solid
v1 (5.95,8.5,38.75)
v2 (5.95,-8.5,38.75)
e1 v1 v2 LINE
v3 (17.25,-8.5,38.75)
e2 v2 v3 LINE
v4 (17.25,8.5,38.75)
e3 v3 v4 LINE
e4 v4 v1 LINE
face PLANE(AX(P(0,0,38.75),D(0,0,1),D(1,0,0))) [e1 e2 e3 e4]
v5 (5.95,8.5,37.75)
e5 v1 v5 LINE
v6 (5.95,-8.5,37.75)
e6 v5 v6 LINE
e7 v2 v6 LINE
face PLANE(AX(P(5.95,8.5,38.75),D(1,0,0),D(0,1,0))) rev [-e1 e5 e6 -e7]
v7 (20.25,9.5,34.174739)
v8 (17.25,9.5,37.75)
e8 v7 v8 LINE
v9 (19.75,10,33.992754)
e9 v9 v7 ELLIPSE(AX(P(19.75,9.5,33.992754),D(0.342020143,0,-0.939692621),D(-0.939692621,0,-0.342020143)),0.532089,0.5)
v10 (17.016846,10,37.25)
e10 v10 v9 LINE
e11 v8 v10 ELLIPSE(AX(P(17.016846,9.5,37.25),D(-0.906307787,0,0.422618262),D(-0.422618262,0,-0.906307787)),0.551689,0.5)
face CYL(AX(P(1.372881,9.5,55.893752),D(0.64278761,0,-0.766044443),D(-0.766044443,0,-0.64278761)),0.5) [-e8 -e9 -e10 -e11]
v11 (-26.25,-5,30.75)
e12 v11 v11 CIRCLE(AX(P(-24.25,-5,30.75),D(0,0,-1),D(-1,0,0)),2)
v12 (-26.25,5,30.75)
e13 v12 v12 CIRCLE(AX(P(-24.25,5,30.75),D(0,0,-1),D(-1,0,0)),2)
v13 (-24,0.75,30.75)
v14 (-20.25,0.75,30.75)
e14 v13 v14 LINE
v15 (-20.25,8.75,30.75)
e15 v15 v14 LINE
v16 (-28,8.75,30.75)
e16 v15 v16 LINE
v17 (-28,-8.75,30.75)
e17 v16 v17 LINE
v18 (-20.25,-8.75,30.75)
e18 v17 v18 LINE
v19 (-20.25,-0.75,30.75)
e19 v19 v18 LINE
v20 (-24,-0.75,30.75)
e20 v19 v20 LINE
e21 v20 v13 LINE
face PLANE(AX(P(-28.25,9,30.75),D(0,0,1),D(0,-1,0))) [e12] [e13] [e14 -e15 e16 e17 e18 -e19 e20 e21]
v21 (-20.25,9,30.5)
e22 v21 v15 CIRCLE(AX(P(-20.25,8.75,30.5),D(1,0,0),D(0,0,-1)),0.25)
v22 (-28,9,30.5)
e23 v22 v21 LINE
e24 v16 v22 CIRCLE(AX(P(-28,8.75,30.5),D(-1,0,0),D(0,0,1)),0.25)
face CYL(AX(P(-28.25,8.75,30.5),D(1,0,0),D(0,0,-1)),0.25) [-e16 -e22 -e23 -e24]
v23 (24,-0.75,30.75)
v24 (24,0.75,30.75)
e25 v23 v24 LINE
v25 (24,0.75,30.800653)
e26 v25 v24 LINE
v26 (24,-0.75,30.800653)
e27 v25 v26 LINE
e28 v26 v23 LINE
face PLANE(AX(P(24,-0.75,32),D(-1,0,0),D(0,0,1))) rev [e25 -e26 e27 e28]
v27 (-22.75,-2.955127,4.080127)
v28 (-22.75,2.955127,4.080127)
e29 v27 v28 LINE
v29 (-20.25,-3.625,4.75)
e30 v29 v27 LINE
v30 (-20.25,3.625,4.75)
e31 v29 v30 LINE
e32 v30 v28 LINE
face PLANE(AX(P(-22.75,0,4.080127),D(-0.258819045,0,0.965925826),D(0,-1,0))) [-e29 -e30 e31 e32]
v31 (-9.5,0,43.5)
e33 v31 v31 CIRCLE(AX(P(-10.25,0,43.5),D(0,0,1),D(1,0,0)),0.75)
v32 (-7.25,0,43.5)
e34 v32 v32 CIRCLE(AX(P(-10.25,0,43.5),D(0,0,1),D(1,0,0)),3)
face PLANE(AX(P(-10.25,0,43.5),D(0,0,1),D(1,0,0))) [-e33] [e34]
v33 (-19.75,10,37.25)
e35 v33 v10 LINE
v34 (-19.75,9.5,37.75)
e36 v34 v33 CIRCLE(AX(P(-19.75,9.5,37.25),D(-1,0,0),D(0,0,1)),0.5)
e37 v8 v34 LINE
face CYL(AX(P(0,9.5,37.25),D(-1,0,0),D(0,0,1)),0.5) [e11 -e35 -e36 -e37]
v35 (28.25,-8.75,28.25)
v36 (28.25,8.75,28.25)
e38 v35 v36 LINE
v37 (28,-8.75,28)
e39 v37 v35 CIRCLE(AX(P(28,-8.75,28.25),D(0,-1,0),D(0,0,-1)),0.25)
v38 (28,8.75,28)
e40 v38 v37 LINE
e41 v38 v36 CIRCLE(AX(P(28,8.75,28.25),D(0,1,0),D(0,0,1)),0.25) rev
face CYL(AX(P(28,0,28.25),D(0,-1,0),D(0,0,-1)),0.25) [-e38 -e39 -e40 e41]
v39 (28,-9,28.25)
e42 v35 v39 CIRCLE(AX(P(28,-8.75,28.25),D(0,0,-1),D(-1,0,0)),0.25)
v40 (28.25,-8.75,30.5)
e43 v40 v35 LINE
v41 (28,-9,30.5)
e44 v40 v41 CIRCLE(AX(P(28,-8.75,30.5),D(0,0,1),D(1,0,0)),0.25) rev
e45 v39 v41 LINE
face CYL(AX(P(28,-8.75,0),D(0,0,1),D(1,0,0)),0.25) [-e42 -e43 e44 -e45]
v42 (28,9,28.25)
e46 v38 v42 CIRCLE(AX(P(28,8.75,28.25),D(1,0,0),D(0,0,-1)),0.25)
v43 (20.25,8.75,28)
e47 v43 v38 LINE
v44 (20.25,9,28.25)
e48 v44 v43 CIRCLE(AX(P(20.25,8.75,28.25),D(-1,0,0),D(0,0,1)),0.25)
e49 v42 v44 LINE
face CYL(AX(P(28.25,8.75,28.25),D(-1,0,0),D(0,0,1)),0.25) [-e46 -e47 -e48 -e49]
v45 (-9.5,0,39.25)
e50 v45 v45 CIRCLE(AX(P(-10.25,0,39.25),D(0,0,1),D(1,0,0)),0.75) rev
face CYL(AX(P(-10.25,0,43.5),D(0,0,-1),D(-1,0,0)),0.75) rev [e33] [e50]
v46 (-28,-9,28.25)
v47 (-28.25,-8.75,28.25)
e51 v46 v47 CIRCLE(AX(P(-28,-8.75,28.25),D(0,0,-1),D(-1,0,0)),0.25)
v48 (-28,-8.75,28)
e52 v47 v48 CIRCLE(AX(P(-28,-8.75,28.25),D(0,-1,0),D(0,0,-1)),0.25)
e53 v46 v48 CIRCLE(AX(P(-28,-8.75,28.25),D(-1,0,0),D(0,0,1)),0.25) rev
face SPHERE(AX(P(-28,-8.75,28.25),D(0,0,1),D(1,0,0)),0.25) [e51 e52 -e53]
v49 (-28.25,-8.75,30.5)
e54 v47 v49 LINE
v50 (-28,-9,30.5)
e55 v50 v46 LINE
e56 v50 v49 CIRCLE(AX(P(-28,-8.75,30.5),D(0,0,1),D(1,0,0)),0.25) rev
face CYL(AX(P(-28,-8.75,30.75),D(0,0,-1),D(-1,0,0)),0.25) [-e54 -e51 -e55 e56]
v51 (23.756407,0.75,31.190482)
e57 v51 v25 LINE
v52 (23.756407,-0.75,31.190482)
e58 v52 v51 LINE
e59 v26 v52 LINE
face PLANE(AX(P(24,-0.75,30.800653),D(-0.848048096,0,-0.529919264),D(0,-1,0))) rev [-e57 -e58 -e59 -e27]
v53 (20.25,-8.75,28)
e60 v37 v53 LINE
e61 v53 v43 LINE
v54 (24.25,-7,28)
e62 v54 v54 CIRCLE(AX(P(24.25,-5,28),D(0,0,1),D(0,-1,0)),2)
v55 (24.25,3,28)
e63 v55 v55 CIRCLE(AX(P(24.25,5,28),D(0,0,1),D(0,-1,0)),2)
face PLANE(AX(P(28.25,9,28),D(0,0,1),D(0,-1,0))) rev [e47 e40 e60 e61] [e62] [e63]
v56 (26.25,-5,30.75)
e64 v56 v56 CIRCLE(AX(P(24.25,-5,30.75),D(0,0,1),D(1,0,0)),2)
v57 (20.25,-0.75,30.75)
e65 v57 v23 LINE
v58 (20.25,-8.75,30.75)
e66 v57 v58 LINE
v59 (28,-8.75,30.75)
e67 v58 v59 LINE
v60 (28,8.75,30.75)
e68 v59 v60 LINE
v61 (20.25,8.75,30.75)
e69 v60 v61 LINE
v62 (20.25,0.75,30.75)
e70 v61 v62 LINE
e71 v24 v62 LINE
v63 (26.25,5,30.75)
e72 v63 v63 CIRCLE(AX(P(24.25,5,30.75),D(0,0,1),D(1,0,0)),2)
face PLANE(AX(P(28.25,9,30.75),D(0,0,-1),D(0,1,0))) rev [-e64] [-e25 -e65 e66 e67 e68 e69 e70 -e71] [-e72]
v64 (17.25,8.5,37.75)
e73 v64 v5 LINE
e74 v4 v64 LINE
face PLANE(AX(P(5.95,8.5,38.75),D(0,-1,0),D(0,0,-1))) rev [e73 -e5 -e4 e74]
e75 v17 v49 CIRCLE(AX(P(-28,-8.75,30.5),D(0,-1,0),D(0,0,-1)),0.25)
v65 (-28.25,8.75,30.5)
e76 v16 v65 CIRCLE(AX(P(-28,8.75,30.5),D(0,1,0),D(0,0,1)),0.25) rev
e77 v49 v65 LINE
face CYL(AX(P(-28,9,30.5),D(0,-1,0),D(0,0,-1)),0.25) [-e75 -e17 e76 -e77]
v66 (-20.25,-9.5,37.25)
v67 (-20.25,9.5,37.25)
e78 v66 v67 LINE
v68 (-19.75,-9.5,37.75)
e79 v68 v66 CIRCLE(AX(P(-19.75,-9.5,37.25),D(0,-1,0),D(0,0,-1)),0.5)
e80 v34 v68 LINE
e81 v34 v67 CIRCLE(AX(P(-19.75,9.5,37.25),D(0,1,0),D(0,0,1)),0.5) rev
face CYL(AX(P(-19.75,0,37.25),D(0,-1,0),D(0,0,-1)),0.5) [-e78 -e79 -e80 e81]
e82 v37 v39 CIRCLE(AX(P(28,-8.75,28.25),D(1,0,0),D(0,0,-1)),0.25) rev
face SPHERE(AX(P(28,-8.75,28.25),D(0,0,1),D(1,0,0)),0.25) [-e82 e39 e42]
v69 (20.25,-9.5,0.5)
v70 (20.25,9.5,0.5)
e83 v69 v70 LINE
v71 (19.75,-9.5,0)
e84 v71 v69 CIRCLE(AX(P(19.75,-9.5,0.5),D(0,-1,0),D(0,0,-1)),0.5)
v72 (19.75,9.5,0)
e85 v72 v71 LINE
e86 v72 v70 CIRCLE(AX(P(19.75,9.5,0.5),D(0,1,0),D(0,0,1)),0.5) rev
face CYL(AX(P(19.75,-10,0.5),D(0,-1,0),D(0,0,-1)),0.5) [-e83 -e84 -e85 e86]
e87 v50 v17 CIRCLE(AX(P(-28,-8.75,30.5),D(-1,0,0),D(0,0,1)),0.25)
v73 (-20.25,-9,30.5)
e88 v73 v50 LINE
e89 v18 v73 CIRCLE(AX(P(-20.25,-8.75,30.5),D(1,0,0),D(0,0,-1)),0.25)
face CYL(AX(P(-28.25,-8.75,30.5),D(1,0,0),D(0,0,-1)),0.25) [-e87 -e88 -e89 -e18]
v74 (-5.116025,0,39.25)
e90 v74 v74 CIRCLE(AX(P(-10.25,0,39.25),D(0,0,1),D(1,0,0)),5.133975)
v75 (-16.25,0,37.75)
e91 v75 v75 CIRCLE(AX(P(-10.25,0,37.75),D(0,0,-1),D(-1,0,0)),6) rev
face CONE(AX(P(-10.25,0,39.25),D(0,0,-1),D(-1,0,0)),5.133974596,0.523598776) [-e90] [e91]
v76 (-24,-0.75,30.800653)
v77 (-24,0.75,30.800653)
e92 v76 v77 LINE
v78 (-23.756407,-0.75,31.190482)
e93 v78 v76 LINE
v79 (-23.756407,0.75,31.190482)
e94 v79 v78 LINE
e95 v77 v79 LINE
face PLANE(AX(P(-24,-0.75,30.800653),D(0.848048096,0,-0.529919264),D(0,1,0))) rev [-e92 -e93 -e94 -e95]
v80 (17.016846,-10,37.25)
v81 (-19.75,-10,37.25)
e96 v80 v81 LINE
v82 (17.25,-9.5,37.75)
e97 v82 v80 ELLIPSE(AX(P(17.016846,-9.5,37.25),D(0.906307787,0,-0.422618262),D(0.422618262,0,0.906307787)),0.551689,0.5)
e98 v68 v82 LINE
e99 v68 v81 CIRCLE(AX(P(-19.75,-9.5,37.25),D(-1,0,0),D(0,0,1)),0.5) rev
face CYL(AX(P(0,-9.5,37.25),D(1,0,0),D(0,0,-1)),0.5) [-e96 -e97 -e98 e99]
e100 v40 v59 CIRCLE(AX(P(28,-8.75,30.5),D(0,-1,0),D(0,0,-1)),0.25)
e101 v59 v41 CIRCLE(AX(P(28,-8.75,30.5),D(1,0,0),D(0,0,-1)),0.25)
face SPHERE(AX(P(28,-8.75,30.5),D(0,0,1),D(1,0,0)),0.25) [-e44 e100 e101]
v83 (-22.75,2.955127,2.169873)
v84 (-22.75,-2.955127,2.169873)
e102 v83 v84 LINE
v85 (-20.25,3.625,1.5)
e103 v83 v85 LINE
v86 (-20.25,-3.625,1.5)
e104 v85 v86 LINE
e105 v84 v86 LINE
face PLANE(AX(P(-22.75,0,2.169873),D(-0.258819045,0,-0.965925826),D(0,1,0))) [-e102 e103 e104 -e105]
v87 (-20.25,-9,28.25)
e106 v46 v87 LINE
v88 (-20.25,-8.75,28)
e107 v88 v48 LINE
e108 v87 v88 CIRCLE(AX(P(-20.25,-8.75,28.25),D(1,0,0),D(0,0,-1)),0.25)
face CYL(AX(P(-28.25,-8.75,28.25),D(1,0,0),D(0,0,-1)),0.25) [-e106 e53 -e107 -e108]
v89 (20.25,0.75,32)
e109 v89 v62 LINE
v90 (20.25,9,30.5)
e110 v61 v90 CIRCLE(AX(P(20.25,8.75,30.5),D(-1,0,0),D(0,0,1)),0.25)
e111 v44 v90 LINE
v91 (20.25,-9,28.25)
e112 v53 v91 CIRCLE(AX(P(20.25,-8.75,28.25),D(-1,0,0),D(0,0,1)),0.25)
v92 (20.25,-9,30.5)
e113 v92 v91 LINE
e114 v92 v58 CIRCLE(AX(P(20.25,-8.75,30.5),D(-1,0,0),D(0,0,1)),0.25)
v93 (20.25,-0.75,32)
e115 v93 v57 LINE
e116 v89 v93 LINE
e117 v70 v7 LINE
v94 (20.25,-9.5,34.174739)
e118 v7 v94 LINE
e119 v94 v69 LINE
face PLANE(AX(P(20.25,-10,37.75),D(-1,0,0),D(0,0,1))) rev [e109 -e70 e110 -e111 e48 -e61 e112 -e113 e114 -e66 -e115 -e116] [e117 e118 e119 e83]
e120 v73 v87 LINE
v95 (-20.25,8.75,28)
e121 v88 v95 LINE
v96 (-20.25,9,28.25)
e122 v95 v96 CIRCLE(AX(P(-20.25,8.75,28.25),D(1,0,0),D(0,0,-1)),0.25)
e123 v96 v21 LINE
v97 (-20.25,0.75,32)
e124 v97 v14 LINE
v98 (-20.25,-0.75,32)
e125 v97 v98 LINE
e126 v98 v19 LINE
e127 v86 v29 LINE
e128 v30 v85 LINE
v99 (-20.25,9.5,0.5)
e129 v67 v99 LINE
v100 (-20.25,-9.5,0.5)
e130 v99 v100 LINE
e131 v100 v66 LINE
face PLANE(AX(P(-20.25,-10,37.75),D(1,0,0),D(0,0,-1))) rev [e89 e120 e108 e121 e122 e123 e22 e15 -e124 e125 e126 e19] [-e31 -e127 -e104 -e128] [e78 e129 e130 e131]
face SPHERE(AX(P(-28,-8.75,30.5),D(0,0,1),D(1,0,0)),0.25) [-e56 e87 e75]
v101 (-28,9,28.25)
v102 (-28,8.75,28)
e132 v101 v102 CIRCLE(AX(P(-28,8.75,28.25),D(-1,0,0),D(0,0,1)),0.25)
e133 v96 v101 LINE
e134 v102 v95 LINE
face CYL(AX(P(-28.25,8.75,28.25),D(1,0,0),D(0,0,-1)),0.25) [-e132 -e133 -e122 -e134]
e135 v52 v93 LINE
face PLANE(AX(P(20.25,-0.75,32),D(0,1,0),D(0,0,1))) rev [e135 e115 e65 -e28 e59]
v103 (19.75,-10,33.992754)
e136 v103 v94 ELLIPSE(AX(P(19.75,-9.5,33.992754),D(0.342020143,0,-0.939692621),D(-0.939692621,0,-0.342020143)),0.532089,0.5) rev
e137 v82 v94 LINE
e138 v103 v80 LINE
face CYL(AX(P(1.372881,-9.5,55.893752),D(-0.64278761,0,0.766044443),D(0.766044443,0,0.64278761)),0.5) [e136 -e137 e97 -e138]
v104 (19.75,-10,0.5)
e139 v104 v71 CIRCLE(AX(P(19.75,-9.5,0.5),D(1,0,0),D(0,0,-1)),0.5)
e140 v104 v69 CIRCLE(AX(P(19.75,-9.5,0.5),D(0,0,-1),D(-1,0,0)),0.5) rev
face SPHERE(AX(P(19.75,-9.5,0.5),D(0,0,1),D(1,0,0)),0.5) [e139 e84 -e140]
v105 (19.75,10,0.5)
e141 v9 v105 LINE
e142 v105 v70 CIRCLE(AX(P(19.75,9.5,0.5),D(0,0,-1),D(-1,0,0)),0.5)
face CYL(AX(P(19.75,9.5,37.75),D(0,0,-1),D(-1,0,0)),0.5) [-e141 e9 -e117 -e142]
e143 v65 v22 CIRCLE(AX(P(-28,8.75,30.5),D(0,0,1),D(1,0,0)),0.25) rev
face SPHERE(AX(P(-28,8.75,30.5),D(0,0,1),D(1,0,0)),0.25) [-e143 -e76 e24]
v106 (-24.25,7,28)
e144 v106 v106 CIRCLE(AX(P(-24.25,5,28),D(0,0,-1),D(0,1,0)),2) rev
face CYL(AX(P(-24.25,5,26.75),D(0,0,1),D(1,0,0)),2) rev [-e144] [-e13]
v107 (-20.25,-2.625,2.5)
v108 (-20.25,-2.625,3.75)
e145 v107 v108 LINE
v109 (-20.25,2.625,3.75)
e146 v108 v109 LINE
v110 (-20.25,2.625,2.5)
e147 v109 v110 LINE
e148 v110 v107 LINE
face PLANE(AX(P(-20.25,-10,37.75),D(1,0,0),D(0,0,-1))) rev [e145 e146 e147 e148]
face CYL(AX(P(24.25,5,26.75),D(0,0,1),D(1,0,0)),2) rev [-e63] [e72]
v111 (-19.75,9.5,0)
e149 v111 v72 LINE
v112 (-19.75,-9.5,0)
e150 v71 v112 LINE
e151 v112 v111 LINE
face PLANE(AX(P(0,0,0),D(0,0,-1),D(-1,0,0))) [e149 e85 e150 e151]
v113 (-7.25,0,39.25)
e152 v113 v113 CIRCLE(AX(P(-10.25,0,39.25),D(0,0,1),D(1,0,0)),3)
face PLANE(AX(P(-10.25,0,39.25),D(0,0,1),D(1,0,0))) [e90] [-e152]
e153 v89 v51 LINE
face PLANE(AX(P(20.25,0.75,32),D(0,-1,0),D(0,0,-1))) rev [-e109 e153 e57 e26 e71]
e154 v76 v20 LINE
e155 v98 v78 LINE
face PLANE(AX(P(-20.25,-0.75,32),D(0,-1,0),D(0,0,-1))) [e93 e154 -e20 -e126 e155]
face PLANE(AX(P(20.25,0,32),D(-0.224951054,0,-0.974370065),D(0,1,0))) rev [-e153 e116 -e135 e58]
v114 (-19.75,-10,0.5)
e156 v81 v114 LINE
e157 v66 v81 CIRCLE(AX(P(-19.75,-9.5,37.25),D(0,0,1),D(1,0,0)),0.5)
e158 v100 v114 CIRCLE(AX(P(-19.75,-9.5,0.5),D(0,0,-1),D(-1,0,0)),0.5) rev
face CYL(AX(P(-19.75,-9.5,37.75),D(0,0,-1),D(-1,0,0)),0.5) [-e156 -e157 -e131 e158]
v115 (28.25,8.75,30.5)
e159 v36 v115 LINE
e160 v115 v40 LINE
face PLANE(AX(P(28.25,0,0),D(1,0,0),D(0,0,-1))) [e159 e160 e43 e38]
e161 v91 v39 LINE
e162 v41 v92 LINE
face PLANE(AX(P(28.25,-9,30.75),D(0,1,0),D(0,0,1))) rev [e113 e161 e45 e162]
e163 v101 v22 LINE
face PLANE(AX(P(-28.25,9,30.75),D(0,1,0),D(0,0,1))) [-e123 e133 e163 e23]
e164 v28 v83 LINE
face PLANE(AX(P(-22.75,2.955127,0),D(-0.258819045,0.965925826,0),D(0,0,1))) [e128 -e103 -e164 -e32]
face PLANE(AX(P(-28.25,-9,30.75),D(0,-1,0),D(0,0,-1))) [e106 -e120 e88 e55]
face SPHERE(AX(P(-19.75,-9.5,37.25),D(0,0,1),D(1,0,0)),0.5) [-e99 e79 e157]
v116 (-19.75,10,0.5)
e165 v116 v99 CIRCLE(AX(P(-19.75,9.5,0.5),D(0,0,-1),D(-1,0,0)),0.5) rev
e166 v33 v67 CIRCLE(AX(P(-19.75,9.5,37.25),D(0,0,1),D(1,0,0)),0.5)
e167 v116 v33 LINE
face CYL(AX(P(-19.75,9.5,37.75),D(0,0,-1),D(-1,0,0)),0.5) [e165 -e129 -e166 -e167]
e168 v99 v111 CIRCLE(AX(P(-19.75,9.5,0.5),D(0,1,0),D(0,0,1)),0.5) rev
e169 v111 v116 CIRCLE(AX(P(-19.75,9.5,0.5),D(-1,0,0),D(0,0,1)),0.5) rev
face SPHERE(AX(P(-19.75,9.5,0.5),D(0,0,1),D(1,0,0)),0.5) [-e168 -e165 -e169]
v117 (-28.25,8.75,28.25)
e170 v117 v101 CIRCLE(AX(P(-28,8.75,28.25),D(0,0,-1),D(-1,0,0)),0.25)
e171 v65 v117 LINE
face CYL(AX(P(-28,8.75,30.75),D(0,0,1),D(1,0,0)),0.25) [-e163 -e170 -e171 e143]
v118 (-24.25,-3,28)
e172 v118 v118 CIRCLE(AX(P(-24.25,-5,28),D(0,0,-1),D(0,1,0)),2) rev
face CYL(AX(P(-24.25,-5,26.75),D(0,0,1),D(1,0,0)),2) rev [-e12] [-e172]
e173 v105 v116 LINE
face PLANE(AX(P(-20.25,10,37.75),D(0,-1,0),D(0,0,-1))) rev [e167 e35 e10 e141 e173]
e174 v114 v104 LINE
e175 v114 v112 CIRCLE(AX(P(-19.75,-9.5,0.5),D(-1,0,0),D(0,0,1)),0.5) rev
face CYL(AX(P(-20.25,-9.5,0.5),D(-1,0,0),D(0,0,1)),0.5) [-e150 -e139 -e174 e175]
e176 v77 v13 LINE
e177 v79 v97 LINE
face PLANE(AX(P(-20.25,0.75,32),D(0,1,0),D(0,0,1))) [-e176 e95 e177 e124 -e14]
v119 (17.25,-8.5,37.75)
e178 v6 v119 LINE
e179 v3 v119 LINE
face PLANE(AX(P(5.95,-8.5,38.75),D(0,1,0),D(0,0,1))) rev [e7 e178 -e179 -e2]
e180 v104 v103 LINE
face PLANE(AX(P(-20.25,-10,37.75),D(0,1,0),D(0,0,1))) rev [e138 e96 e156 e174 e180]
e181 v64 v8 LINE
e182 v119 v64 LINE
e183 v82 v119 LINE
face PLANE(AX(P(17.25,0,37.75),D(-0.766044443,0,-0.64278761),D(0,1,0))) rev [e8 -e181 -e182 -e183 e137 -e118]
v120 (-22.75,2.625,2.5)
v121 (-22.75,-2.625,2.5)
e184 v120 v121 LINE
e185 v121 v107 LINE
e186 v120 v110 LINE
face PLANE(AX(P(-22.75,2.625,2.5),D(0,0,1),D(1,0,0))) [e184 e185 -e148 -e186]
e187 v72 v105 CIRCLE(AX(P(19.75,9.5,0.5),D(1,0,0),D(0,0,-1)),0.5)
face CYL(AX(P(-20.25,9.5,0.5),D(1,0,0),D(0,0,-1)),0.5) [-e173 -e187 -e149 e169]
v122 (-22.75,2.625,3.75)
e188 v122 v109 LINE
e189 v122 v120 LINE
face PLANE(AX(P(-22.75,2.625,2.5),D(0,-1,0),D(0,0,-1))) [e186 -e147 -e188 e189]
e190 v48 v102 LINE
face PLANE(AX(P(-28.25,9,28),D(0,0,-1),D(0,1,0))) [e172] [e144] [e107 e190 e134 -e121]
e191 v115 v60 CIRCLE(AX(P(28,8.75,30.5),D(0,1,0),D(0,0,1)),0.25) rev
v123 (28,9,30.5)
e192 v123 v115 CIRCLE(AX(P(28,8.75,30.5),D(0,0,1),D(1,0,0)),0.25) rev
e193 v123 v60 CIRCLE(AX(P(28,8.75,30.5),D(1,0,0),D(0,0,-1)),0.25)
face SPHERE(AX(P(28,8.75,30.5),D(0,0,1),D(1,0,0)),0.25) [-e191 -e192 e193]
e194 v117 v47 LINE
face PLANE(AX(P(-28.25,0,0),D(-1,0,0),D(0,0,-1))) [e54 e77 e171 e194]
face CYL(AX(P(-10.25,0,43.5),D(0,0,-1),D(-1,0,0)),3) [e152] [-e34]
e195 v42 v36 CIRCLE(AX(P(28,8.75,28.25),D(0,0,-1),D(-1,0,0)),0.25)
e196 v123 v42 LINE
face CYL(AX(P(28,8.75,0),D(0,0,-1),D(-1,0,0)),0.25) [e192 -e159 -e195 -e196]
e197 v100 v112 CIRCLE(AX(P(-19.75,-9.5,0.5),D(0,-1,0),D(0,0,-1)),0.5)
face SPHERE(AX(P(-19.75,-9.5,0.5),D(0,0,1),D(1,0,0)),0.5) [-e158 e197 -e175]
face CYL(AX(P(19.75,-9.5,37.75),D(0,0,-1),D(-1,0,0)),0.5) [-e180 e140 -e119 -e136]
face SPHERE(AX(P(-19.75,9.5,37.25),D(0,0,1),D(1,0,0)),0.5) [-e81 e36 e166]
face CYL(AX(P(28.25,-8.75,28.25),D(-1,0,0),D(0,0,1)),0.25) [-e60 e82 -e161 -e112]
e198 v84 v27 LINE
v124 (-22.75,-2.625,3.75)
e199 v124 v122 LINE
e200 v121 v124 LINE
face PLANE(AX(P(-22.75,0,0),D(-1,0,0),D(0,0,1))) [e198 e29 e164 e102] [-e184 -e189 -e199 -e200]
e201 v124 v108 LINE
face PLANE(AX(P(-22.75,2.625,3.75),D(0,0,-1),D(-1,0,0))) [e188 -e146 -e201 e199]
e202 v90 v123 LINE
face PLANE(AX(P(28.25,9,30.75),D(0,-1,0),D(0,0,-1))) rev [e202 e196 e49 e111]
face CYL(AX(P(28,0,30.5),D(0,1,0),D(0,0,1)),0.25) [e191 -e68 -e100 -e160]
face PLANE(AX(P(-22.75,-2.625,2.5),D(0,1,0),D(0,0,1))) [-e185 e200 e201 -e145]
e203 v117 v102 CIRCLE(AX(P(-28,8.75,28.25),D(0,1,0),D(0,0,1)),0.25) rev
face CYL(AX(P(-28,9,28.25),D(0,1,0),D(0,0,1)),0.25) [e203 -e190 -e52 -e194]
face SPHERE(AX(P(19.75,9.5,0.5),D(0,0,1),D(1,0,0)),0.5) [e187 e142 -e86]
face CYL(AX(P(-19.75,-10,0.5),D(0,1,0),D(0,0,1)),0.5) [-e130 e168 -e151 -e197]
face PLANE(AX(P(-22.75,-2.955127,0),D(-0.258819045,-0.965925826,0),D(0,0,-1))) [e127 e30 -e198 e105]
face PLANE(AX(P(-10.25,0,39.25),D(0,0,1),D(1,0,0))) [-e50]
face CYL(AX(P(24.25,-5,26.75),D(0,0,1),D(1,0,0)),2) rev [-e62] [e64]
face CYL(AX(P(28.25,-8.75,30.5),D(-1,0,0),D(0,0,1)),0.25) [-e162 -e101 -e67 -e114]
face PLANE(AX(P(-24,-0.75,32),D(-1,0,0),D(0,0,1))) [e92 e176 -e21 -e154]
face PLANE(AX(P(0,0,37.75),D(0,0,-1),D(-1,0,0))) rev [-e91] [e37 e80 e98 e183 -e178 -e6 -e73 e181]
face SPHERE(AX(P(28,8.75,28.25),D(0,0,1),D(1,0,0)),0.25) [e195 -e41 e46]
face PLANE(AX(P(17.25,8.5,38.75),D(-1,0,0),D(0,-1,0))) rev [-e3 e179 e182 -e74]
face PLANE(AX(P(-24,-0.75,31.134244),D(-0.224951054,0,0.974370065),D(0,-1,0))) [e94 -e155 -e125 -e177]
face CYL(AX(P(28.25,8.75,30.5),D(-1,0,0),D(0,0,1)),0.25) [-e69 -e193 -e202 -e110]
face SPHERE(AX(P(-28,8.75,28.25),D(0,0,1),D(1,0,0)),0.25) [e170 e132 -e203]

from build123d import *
from OCP.BRepFilletAPI import BRepFilletAPI_MakeChamfer

# Parameters (mm, degrees)
SKETCH1_W                 = 40.5
SKETCH1_H                 = 20
BOSS_EXTRUDE1_DEPTH       = 37.75
SKETCH2_W                 = 2.75
SKETCH2_H                 = 18
BOSS_EXTRUDE2_DEPTH       = 8
SKETCH3_R                 = 2
CUT_EXTRUDE1_DEPTH        = 4
SKETCH4_W                 = 3.75
SKETCH4_H                 = 1.5
BOSS_EXTRUDE3_DEPTH       = 1.25
CHAMFER1_SIZE2            = 0.865755717
CHAMFER1_SIZE             = 3.75
CHAMFER2_SIZE             = 0.25
CHAMFER2_SIZE2            = 0.333581356
FILLET1_R                 = 0.25
CHAMFER1_OF_MIRROR1_SIZE2 = 0.865755717
CHAMFER1_OF_MIRROR1_SIZE  = 3.75
CHAMFER2_OF_MIRROR1_SIZE2 = 0.25
CHAMFER2_OF_MIRROR1_SIZE  = 0.333581356
FILLET1_OF_MIRROR1_R      = 0.25
SKETCH5_W                 = 11.3
SKETCH5_H                 = 17
BOSS_EXTRUDE4_DEPTH       = 1
SKETCH6_R                 = 6
BOSS_EXTRUDE5_DEPTH       = 1.5
CHAMFER3_SIZE2            = 0.866025404
CHAMFER3_SIZE             = 1.5
SKETCH7_R                 = 3
SKETCH7_R_2               = 0.75
BOSS_EXTRUDE6_DEPTH       = 4.25
SKETCH8_W                 = 3.25
SKETCH8_H                 = 7.25
SKETCH8_W_2               = 1.25
SKETCH8_H_2               = 5.25
BOSS_EXTRUDE7_DEPTH       = 2.5
CHAMFER5_SIZE2            = 3.575260778
CHAMFER5_SIZE             = 3
CHAMFER4_SIZE             = 2.5
CHAMFER4_SIZE_2           = 0.669872981
FILLET2_R                 = 0.5


with BuildPart() as part:
    # Sketch1 → Boss-Extrude1 (new body)
    with BuildSketch(Plane.XY):
        Rectangle(SKETCH1_W, SKETCH1_H)
    extrude(amount=BOSS_EXTRUDE1_DEPTH)

    # Sketch2 → Boss-Extrude2 (add)
    with BuildSketch(Plane(origin=(20.25, 0, 0), x_dir=(0, 0, -1), z_dir=(1, 0, 0))):
        with Locations((-29.375, 0)):
            Rectangle(SKETCH2_W, SKETCH2_H)
    boss_extrude2 = extrude(amount=BOSS_EXTRUDE2_DEPTH)

    # Sketch3 → Cut-Extrude1 (cut)
    with BuildSketch(Plane.XY.offset(30.75)):
        with Locations((24.25, 5)):
            Circle(SKETCH3_R)
        with Locations((24.25, -5)):
            Circle(SKETCH3_R)
    cut_extrude1 = extrude(amount=-CUT_EXTRUDE1_DEPTH, mode=Mode.SUBTRACT)

    # Sketch4 → Boss-Extrude3 (add)
    with BuildSketch(Plane.XY.offset(30.75)):
        with Locations((22.125, 0)):
            Rectangle(SKETCH4_W, SKETCH4_H)
    boss_extrude3 = extrude(amount=BOSS_EXTRUDE3_DEPTH)

    # Chamfer1
    chamfer1_edges = [part.edges().sort_by_distance(p)[0] for p in [
        (24, 0, 32),
    ]]
    chamfer1_side = [part.faces().sort_by_distance(p)[0] for p in [
        (23.982684886, 0, 32),
    ]]
    chamfer(chamfer1_edges, length=CHAMFER1_SIZE - 0.0001, length2=CHAMFER1_SIZE2 - 0.0001, reference=chamfer1_side[0])  # a hair under: the kernel refuses the full size

    # Chamfer2
    chamfer2_edges = [part.edges().sort_by_distance(p)[0] for p in [
        (24, 0, 31.134344283),
    ]]
    chamfer2_side = [part.faces().sort_by_distance(p)[0] for p in [
        (22.12505, 0, 31.567172141),
    ]]
    chamfer(chamfer2_edges, length=CHAMFER2_SIZE, length2=CHAMFER2_SIZE2, reference=chamfer2_side[0])

    # Fillet1
    fillet1_edges = [part.edges().sort_by_distance(p)[0] for p in [
        (24.25, 9, 30.75),
        (24.25, -9, 30.75),
        (24.25, -9, 28),
        (24.25, 9, 28),
        (28.25, 0, 30.75),
        (28.25, -9, 29.375),
        (28.25, 0, 28),
        (28.25, 9, 29.375),
    ]]
    fillet(fillet1_edges, radius=FILLET1_R)

    # Mirror1: Boss-Extrude2, Cut-Extrude1, Boss-Extrude3 across plane
    add(boss_extrude2.mirror(Plane(origin=(0, 0, 0), x_dir=(0, 0, 1), z_dir=(1, 0, 0))))
    add(cut_extrude1.mirror(Plane(origin=(0, 0, 0), x_dir=(0, 0, 1), z_dir=(1, 0, 0))), mode=Mode.SUBTRACT)
    add(boss_extrude3.mirror(Plane(origin=(0, 0, 0), x_dir=(0, 0, 1), z_dir=(1, 0, 0))))

    # Chamfer1 of Mirror1
    chamfer1_of_mirror1_edges = [part.edges().sort_by_distance(p)[0] for p in [
        (-24, 0, 32),
    ]]
    chamfer1_of_mirror1_side = [part.faces().sort_by_distance(p)[0] for p in [
        (-23.982684886, 0, 32),
    ]]
    chamfer(chamfer1_of_mirror1_edges, length=CHAMFER1_OF_MIRROR1_SIZE - 0.0001, length2=CHAMFER1_OF_MIRROR1_SIZE2 - 0.0001, reference=chamfer1_of_mirror1_side[0])  # a hair under: the kernel refuses the full size

    # Chamfer2 of Mirror1
    chamfer2_of_mirror1_edges = [part.edges().sort_by_distance(p)[0] for p in [
        (-24, 0, 31.134344283),
    ]]
    chamfer(chamfer2_of_mirror1_edges, length=CHAMFER2_OF_MIRROR1_SIZE, length2=CHAMFER2_OF_MIRROR1_SIZE2)

    # Fillet1 of Mirror1
    fillet1_of_mirror1_edges = [part.edges().sort_by_distance(p)[0] for p in [
        (-24.25, 9, 30.75),
        (-24.25, -9, 30.75),
        (-24.25, -9, 28),
        (-24.25, 9, 28),
        (-28.25, 0, 30.75),
        (-28.25, -9, 29.375),
        (-28.25, 0, 28),
        (-28.25, 9, 29.375),
    ]]
    fillet(fillet1_of_mirror1_edges, radius=FILLET1_OF_MIRROR1_R)

    # Sketch5 → Boss-Extrude4 (add)
    with BuildSketch(Plane.XY.offset(37.75)):
        with Locations((11.6, 0)):
            Rectangle(SKETCH5_W, SKETCH5_H)
    extrude(amount=BOSS_EXTRUDE4_DEPTH)

    # Sketch6 → Boss-Extrude5 (add)
    with BuildSketch(Plane.XY.offset(37.75)):
        with Locations(Location((-10.25, 0, 0), (0, 0, 180))):
            Circle(SKETCH6_R)
    extrude(amount=BOSS_EXTRUDE5_DEPTH)

    # Chamfer3
    chamfer3_edges = [part.edges().sort_by_distance(p)[0] for p in [
        (-4.25, 0, 39.25),
    ]]
    chamfer3_side = [part.faces().sort_by_distance(p)[0] for p in [
        (-4.25, 0, 39.232679492),
    ]]
    chamfer(chamfer3_edges, length=CHAMFER3_SIZE - 0.0001, length2=CHAMFER3_SIZE2 - 0.0001, reference=chamfer3_side[0])  # a hair under: the kernel refuses the full size

    # Sketch7 → Boss-Extrude6 (add)
    with BuildSketch(Plane.XY.offset(39.25)):
        with Locations((-10.25, 0)):
            Circle(SKETCH7_R)
        with Locations((-10.25, 0)):
            Circle(SKETCH7_R_2, mode=Mode.SUBTRACT)
    extrude(amount=BOSS_EXTRUDE6_DEPTH)

    # Sketch8 → Boss-Extrude7 (add)
    with BuildSketch(Plane.ZY.offset(20.25)):
        with Locations((3.125, 0)):
            Rectangle(SKETCH8_W, SKETCH8_H)
        with Locations((3.125, 0)):
            Rectangle(SKETCH8_W_2, SKETCH8_H_2, mode=Mode.SUBTRACT)
    extrude(amount=BOSS_EXTRUDE7_DEPTH)

    # Chamfer5
    chamfer5_edges = [part.edges().sort_by_distance(p)[0] for p in [
        (20.25, 0, 37.75),
    ]]
    chamfer5_side = [part.faces().sort_by_distance(p)[0] for p in [
        (20.19, 0, 37.75),
    ]]
    chamfer(chamfer5_edges, length=CHAMFER5_SIZE - 0.0001, length2=CHAMFER5_SIZE2 - 0.0001, reference=chamfer5_side[0])  # a hair under: the kernel refuses the full size

    # Chamfer4
    chamfer4_edges_1 = [part.edges().sort_by_distance(p)[0] for p in [
        (-22.75, -3.625, 3.125),
    ]]
    chamfer4_side_1 = [part.faces().sort_by_distance(p)[0] for p in [
        (-22.73660254, -3.625, 3.125),
    ]]
    chamfer4_edges_2 = [part.edges().sort_by_distance(p)[0] for p in [
        (-22.75, 0, 4.75),
    ]]
    chamfer4_side_2 = [part.faces().sort_by_distance(p)[0] for p in [
        (-22.73660254, 0, 4.75),
    ]]
    chamfer4_edges_3 = [part.edges().sort_by_distance(p)[0] for p in [
        (-22.75, 3.625, 3.125),
    ]]
    chamfer4_side_3 = [part.faces().sort_by_distance(p)[0] for p in [
        (-22.73660254, 3.625, 3.125),
    ]]
    chamfer4_edges_4 = [part.edges().sort_by_distance(p)[0] for p in [
        (-22.75, 0, 1.5),
    ]]
    chamfer4_side_4 = [part.faces().sort_by_distance(p)[0] for p in [
        (-22.73660254, 0, 1.5),
    ]]
    chamfer4 = BRepFilletAPI_MakeChamfer(part.part.solid().wrapped)
    for e in chamfer4_edges_1:
        chamfer4.Add(CHAMFER4_SIZE - 0.0001, CHAMFER4_SIZE_2 - 0.0001, e.wrapped, chamfer4_side_1[0].wrapped)
    for e in chamfer4_edges_2:
        chamfer4.Add(CHAMFER4_SIZE - 0.0001, CHAMFER4_SIZE_2 - 0.0001, e.wrapped, chamfer4_side_2[0].wrapped)
    for e in chamfer4_edges_3:
        chamfer4.Add(CHAMFER4_SIZE - 0.0001, CHAMFER4_SIZE_2 - 0.0001, e.wrapped, chamfer4_side_3[0].wrapped)
    for e in chamfer4_edges_4:
        chamfer4.Add(CHAMFER4_SIZE - 0.0001, CHAMFER4_SIZE_2 - 0.0001, e.wrapped, chamfer4_side_4[0].wrapped)
    add(Compound.cast(chamfer4.Shape()), mode=Mode.REPLACE)  # a hair under: the kernel refuses the full size

    # Fillet2
    fillet2_edges = [part.edges().sort_by_distance(p)[0] for p in [
        (-20.25, 0, 37.75),
        (-1.49995, -10, 37.75),
        (-1.49995, 10, 37.75),
        (20.25, 10, 17.087419611),
        (18.75005, 10, 35.962419611),
        (20.25, -10, 17.087419611),
        (18.75005, -10, 35.962419611),
        (0, -10, 0),
        (-20.25, 0, 0),
        (0, 10, 0),
        (20.25, 0, 0),
        (-20.25, -10, 18.875),
        (-20.25, 10, 18.875),
    ]]
    fillet(fillet2_edges, radius=FILLET2_R)


solid = part.part
